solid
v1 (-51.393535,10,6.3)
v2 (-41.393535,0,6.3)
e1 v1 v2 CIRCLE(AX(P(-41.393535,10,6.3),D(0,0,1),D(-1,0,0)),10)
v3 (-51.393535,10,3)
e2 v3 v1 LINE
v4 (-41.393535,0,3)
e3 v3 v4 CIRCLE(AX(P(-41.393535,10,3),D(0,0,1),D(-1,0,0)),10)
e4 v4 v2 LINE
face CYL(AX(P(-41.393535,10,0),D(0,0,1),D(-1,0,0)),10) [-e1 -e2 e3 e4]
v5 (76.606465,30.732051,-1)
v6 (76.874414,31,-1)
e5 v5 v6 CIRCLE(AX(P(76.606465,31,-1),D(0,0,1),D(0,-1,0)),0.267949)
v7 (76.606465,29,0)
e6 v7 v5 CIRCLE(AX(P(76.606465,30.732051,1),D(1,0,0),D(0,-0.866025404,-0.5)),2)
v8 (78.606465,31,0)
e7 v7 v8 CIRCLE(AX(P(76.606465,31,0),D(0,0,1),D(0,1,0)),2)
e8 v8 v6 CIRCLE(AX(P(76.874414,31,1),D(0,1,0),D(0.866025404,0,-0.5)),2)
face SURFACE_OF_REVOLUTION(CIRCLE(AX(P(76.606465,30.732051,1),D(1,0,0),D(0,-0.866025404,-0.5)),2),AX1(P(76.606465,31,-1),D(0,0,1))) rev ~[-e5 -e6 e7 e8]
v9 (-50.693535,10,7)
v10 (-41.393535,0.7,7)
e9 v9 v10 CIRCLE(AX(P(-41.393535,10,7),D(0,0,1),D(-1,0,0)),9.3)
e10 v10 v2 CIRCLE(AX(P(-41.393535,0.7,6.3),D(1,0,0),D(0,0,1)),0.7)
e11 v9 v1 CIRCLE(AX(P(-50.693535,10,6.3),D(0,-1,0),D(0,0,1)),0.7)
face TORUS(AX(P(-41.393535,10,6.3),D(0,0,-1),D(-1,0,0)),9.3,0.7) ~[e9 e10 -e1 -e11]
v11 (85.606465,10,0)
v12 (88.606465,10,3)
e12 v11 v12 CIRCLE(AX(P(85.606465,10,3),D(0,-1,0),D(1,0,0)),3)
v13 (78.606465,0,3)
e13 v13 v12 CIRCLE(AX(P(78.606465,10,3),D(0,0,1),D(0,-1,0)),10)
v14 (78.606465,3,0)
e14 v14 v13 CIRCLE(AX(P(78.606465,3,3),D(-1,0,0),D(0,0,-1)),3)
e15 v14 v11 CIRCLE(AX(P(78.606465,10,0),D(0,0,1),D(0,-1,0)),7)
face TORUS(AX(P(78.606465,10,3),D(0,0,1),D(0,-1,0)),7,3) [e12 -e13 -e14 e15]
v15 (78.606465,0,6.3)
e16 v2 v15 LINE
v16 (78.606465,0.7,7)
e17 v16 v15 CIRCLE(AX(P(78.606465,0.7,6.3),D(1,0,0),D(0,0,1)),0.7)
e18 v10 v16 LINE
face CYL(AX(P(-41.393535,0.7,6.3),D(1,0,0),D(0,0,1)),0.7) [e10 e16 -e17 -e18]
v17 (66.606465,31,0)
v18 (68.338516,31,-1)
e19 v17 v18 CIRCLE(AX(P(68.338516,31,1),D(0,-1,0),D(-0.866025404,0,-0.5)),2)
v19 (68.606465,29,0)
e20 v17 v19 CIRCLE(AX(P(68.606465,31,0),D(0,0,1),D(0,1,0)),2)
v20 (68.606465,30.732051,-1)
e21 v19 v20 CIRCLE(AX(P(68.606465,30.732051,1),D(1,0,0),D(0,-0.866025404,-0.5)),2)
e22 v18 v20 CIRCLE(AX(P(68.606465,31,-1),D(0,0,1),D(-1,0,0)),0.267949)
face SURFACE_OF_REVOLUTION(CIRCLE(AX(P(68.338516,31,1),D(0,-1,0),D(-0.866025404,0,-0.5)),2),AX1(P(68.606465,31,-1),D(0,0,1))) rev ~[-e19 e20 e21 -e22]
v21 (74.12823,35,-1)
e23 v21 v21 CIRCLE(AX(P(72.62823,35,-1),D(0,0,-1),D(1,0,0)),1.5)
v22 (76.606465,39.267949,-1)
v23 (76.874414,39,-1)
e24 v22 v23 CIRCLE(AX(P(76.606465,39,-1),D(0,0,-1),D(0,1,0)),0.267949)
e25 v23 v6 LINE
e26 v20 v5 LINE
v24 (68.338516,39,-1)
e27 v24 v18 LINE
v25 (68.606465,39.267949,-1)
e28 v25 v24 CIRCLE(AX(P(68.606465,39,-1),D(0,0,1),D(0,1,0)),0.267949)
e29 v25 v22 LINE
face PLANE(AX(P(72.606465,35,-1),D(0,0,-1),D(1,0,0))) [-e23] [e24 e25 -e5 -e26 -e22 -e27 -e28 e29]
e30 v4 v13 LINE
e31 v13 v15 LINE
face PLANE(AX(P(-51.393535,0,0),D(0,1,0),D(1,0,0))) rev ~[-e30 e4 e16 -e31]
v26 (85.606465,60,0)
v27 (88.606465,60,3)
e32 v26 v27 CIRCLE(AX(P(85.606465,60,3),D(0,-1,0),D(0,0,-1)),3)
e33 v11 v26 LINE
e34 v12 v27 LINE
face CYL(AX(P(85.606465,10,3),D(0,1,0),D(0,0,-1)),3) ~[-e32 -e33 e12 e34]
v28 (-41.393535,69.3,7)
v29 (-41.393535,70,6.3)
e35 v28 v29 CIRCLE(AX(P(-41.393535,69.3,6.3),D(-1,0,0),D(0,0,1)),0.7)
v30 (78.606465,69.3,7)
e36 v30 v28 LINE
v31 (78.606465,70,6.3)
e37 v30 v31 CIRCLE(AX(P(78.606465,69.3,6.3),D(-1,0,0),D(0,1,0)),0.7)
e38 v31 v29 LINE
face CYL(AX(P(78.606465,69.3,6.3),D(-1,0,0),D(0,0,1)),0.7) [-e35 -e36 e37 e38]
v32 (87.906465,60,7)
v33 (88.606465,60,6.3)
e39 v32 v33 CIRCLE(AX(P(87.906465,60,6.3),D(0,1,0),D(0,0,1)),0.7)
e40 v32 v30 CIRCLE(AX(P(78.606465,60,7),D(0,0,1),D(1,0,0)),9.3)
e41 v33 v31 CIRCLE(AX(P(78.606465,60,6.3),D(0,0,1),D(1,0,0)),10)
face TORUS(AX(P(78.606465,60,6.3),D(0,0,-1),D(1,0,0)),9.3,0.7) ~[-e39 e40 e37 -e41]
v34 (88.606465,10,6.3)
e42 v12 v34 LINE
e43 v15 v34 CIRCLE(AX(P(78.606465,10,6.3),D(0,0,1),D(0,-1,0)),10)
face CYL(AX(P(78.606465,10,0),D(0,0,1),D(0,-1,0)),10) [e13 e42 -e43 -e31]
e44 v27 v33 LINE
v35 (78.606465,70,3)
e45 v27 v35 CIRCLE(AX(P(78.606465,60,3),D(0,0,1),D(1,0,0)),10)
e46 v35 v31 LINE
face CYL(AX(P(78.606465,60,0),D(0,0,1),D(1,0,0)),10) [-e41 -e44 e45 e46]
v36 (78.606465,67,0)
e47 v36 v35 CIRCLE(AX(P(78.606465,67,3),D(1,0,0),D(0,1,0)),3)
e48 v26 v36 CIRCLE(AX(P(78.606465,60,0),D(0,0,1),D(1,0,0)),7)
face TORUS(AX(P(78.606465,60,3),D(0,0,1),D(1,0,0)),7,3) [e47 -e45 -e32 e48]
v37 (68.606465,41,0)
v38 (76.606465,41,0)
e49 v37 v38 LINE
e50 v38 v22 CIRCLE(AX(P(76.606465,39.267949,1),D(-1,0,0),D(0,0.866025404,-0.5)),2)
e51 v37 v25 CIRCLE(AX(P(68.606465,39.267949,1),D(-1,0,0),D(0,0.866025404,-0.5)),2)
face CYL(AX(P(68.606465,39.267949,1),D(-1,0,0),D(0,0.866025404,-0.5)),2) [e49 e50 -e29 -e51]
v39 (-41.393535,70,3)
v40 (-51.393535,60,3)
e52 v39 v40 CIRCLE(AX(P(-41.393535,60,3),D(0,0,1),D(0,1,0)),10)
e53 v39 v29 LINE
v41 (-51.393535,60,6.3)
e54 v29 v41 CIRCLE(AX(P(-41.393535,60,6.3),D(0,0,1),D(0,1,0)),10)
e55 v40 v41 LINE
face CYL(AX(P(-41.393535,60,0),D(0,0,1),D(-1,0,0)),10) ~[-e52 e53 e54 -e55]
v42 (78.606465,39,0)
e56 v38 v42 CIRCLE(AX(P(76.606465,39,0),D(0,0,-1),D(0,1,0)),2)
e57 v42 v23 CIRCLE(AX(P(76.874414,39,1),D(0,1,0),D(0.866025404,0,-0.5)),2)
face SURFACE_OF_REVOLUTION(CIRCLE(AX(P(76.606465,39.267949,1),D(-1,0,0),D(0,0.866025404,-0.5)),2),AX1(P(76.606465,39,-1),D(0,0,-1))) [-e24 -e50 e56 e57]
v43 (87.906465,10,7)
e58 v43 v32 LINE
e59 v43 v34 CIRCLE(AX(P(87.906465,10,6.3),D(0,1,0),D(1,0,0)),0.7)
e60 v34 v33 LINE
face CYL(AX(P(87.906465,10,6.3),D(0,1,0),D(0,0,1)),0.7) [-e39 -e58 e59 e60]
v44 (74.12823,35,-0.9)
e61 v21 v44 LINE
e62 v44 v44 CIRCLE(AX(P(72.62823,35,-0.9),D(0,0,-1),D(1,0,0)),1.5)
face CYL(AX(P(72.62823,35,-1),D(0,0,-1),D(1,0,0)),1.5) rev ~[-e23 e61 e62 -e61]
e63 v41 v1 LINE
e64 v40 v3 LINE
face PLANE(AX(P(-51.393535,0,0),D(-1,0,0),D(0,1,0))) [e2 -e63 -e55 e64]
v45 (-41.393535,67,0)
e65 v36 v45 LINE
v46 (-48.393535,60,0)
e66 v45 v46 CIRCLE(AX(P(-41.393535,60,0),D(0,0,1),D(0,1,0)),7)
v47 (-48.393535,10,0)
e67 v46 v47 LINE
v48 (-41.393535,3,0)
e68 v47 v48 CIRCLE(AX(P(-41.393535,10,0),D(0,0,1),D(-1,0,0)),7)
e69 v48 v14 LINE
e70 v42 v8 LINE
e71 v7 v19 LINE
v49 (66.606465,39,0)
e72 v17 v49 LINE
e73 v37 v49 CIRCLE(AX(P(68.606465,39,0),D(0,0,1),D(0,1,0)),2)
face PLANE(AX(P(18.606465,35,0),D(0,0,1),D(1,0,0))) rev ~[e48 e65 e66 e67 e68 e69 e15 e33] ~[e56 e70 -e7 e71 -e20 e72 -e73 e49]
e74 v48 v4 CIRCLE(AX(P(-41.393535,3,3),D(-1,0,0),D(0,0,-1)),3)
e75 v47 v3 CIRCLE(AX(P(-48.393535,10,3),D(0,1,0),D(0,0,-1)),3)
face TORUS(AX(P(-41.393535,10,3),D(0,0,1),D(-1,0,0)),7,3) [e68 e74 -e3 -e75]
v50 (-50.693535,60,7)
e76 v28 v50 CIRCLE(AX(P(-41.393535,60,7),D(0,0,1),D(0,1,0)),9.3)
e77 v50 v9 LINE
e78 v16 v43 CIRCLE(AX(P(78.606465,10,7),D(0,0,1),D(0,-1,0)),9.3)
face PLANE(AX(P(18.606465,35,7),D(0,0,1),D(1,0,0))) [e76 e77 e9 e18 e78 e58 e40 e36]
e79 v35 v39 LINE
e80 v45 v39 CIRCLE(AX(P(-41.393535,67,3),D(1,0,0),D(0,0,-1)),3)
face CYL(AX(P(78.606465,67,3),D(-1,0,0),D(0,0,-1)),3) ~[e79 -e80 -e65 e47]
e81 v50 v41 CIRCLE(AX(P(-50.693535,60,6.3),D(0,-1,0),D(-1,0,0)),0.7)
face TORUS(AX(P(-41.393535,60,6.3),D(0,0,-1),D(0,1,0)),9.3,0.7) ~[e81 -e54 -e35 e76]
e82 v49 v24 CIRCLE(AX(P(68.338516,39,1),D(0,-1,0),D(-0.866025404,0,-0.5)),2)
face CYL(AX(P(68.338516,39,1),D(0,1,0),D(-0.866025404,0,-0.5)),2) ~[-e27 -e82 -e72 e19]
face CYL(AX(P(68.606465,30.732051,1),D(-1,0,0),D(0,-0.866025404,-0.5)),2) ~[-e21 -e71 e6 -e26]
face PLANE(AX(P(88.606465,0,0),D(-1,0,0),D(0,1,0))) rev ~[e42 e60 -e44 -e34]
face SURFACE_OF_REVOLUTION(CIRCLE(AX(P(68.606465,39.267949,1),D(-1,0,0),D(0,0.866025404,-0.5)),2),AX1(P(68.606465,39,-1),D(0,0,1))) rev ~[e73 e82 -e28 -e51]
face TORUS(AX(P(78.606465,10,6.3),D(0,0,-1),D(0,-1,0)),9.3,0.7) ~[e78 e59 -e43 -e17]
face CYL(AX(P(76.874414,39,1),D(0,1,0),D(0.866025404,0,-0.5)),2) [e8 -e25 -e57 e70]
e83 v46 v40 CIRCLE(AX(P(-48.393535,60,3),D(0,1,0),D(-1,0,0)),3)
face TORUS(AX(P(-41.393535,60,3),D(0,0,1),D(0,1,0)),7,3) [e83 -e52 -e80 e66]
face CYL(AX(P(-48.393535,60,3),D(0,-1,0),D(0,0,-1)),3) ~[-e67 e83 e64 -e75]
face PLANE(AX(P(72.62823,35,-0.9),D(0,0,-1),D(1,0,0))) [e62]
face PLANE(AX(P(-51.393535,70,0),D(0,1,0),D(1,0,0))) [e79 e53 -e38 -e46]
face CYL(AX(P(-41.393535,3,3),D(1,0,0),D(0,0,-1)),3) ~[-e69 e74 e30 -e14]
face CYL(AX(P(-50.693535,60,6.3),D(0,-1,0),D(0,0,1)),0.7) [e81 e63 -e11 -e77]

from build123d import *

# Parameters (mm, degrees)
F0_W         = 140
F0_H         = 70
F1_DEPTH     = 7
F2_R         = 10
F3_R         = 0.7
F4_R         = 3
F6_DEPTH     = 1
F7_R         = 2
F8_T1_DEPTH  = 8
F8_T3_DEPTH  = 8
F8_T6_ANGLE  = 90
F8_T8_ANGLE  = 90
F8_T10_ANGLE = 90
F8_T12_ANGLE = 90
F9_DEPTH     = 0.5
F10_R        = 1.5
F11_DEPTH    = 0.1


# Not quite as in the source:
# - a fillet or chamfer that OpenCascade refuses, or shapes differently, is made with other operations: its cross-section is extruded or revolved along the edge and cut away or added


with BuildPart() as f1:
    # F0 (on Top) → F1 (new body)
    with BuildSketch(Plane.XY):
        with Locations((18.6064650118, 35)):
            Rectangle(F0_W, F0_H)
    extrude(amount=F1_DEPTH)

    # F2
    f2_edges = [f1.edges().sort_by_distance(p)[0] for p in [
        (88.606465, 70, 3.5),
        (88.606465, 0, 3.5),
        (-51.393535, 0, 3.5),
        (-51.393535, 70, 3.5),
    ]]
    fillet(f2_edges, radius=F2_R)

    # F3
    f3_edges = [f1.edges().sort_by_distance(p)[0] for p in [
        (18.606465, 0, 7),
        (88.606465, 35, 7),
        (85.677533, 2.928932, 7),
        (85.677533, 67.071068, 7),
        (18.606465, 70, 7),
        (-48.464603, 2.928932, 7),
        (-48.464603, 67.071068, 7),
        (-51.393535, 35, 7),
    ]]
    fillet(f3_edges, radius=F3_R)

    # F4
    f4_edges = [f1.edges().sort_by_distance(p)[0] for p in [
        (18.606465, 0, 0),
        (88.606465, 35, 0),
        (85.677533, 2.928932, 0),
        (85.677533, 67.071068, 0),
        (18.606465, 70, 0),
        (-48.464603, 2.928932, 0),
        (-48.464603, 67.071068, 0),
        (-51.393535, 35, 0),
    ]]
    fillet(f4_edges, radius=F4_R)

    # F5 (on face) → F6 (join)
    with BuildSketch(Plane(origin=(0, 0, 0), x_dir=(1, 0, 0), z_dir=(0, 0, -1))):
        Polygon((78.6064650118, -41), (78.6064650118, -35), (78.6064650118, -29), (66.6064650118, -29), (66.6064650118, -41), align=None)
    extrude(amount=F6_DEPTH)

    # F7
    f7_edges = [f1.edges().sort_by_distance(p)[0] for p in [
        (66.606465, 41, -0.5),
        (66.606465, 29, -0.5),
        (78.606465, 29, -0.5),
        (78.606465, 41, -0.5),
    ]]
    fillet(f7_edges, radius=F7_R)

    # F8: fillet of radius 2 on 1 edges, made by hand

    # F8_s2 → F8_t1 (cut)
    with BuildSketch(Plane.YZ.offset(68.6064650118)):
        with BuildLine():
            ThreePointArc((41, 0), (40.2679491924, -0.7320508076), (39.2679491924, -1))
            Line((39.2679491924, -1), (41, -1))
            Line((41, -1), (41, 0))
        make_face()
        with BuildLine():
            ThreePointArc((29, 0), (29.7320508076, -0.7320508076), (30.7320508076, -1))
            Line((30.7320508076, -1), (29, -1))
            Line((29, -1), (29, 0))
        make_face()
    extrude(amount=F8_T1_DEPTH, mode=Mode.SUBTRACT)

    # F8_s4 → F8_t3 (cut)
    with BuildSketch(Plane.XZ.offset(-39)):
        with BuildLine():
            ThreePointArc((78.6064650118, 0), (77.8744142043, -0.7320508076), (76.8744142043, -1))
            Line((76.8744142043, -1), (78.6064650118, -1))
            Line((78.6064650118, -1), (78.6064650118, 0))
        make_face()
        with BuildLine():
            ThreePointArc((66.6064650118, 0), (67.3385158194, -0.7320508076), (68.3385158194, -1))
            Line((68.3385158194, -1), (66.6064650118, -1))
            Line((66.6064650118, -1), (66.6064650118, 0))
        make_face()
    extrude(amount=F8_T3_DEPTH, mode=Mode.SUBTRACT)

    # F8_s5 → F8_t6 (revolve, cut)
    with BuildSketch(Plane.YZ.offset(68.6064650118)):
        with BuildLine():
            ThreePointArc((41, 0), (40.2679491924, -0.7320508076), (39.2679491924, -1))
            Line((39.2679491924, -1), (41, -1))
            Line((41, -1), (41, 0))
        make_face()
    revolve(axis=Axis((68.6064650118, 39, -1), (0, 0, 1)), revolution_arc=F8_T6_ANGLE, mode=Mode.SUBTRACT)

    # F8_s7 → F8_t8 (revolve, cut)
    with BuildSketch(Plane.YZ.offset(76.6064650118)):
        with BuildLine():
            ThreePointArc((41, 0), (40.2679491924, -0.7320508076), (39.2679491924, -1))
            Line((39.2679491924, -1), (41, -1))
            Line((41, -1), (41, 0))
        make_face()
    revolve(axis=Axis((76.6064650118, 39, -1), (0, 0, -1)), revolution_arc=F8_T8_ANGLE, mode=Mode.SUBTRACT)

    # F8_s9 → F8_t10 (revolve, cut)
    with BuildSketch(Plane.YZ.offset(76.6064650118)):
        with BuildLine():
            ThreePointArc((29, 0), (29.7320508076, -0.7320508076), (30.7320508076, -1))
            Line((30.7320508076, -1), (29, -1))
            Line((29, -1), (29, 0))
        make_face()
    revolve(axis=Axis((76.6064650118, 31, -1), (0, 0, 1)), revolution_arc=F8_T10_ANGLE, mode=Mode.SUBTRACT)

    # F8_s11 → F8_t12 (revolve, cut)
    with BuildSketch(Plane.XZ.offset(-31)):
        with BuildLine():
            ThreePointArc((66.6064650118, 0), (67.3385158194, -0.7320508076), (68.3385158194, -1))
            Line((68.3385158194, -1), (66.6064650118, -1))
            Line((66.6064650118, -1), (66.6064650118, 0))
        make_face()
    revolve(axis=Axis((68.6064650118, 31, -1), (0, 0, 1)), revolution_arc=F8_T12_ANGLE, mode=Mode.SUBTRACT)

    # F9 (cut): faces of the model
    f9_faces = [f1.faces().sort_by_distance(p)[0] for p in [
        (72.6064650118, 35, -1),
        (17.7021104435, 35, 0),
    ]]
    extrude(f9_faces, amount=F9_DEPTH, mode=Mode.SUBTRACT)

    # F10 (on face) → F11 (cut)
    with BuildSketch(Plane(origin=(0, 0, -1), x_dir=(1, 0, 0), z_dir=(0, 0, -1))):
        with Locations((72.6282298565, -35)):
            Circle(F10_R)
    extrude(amount=-F11_DEPTH, mode=Mode.SUBTRACT)


solid = f1.part
